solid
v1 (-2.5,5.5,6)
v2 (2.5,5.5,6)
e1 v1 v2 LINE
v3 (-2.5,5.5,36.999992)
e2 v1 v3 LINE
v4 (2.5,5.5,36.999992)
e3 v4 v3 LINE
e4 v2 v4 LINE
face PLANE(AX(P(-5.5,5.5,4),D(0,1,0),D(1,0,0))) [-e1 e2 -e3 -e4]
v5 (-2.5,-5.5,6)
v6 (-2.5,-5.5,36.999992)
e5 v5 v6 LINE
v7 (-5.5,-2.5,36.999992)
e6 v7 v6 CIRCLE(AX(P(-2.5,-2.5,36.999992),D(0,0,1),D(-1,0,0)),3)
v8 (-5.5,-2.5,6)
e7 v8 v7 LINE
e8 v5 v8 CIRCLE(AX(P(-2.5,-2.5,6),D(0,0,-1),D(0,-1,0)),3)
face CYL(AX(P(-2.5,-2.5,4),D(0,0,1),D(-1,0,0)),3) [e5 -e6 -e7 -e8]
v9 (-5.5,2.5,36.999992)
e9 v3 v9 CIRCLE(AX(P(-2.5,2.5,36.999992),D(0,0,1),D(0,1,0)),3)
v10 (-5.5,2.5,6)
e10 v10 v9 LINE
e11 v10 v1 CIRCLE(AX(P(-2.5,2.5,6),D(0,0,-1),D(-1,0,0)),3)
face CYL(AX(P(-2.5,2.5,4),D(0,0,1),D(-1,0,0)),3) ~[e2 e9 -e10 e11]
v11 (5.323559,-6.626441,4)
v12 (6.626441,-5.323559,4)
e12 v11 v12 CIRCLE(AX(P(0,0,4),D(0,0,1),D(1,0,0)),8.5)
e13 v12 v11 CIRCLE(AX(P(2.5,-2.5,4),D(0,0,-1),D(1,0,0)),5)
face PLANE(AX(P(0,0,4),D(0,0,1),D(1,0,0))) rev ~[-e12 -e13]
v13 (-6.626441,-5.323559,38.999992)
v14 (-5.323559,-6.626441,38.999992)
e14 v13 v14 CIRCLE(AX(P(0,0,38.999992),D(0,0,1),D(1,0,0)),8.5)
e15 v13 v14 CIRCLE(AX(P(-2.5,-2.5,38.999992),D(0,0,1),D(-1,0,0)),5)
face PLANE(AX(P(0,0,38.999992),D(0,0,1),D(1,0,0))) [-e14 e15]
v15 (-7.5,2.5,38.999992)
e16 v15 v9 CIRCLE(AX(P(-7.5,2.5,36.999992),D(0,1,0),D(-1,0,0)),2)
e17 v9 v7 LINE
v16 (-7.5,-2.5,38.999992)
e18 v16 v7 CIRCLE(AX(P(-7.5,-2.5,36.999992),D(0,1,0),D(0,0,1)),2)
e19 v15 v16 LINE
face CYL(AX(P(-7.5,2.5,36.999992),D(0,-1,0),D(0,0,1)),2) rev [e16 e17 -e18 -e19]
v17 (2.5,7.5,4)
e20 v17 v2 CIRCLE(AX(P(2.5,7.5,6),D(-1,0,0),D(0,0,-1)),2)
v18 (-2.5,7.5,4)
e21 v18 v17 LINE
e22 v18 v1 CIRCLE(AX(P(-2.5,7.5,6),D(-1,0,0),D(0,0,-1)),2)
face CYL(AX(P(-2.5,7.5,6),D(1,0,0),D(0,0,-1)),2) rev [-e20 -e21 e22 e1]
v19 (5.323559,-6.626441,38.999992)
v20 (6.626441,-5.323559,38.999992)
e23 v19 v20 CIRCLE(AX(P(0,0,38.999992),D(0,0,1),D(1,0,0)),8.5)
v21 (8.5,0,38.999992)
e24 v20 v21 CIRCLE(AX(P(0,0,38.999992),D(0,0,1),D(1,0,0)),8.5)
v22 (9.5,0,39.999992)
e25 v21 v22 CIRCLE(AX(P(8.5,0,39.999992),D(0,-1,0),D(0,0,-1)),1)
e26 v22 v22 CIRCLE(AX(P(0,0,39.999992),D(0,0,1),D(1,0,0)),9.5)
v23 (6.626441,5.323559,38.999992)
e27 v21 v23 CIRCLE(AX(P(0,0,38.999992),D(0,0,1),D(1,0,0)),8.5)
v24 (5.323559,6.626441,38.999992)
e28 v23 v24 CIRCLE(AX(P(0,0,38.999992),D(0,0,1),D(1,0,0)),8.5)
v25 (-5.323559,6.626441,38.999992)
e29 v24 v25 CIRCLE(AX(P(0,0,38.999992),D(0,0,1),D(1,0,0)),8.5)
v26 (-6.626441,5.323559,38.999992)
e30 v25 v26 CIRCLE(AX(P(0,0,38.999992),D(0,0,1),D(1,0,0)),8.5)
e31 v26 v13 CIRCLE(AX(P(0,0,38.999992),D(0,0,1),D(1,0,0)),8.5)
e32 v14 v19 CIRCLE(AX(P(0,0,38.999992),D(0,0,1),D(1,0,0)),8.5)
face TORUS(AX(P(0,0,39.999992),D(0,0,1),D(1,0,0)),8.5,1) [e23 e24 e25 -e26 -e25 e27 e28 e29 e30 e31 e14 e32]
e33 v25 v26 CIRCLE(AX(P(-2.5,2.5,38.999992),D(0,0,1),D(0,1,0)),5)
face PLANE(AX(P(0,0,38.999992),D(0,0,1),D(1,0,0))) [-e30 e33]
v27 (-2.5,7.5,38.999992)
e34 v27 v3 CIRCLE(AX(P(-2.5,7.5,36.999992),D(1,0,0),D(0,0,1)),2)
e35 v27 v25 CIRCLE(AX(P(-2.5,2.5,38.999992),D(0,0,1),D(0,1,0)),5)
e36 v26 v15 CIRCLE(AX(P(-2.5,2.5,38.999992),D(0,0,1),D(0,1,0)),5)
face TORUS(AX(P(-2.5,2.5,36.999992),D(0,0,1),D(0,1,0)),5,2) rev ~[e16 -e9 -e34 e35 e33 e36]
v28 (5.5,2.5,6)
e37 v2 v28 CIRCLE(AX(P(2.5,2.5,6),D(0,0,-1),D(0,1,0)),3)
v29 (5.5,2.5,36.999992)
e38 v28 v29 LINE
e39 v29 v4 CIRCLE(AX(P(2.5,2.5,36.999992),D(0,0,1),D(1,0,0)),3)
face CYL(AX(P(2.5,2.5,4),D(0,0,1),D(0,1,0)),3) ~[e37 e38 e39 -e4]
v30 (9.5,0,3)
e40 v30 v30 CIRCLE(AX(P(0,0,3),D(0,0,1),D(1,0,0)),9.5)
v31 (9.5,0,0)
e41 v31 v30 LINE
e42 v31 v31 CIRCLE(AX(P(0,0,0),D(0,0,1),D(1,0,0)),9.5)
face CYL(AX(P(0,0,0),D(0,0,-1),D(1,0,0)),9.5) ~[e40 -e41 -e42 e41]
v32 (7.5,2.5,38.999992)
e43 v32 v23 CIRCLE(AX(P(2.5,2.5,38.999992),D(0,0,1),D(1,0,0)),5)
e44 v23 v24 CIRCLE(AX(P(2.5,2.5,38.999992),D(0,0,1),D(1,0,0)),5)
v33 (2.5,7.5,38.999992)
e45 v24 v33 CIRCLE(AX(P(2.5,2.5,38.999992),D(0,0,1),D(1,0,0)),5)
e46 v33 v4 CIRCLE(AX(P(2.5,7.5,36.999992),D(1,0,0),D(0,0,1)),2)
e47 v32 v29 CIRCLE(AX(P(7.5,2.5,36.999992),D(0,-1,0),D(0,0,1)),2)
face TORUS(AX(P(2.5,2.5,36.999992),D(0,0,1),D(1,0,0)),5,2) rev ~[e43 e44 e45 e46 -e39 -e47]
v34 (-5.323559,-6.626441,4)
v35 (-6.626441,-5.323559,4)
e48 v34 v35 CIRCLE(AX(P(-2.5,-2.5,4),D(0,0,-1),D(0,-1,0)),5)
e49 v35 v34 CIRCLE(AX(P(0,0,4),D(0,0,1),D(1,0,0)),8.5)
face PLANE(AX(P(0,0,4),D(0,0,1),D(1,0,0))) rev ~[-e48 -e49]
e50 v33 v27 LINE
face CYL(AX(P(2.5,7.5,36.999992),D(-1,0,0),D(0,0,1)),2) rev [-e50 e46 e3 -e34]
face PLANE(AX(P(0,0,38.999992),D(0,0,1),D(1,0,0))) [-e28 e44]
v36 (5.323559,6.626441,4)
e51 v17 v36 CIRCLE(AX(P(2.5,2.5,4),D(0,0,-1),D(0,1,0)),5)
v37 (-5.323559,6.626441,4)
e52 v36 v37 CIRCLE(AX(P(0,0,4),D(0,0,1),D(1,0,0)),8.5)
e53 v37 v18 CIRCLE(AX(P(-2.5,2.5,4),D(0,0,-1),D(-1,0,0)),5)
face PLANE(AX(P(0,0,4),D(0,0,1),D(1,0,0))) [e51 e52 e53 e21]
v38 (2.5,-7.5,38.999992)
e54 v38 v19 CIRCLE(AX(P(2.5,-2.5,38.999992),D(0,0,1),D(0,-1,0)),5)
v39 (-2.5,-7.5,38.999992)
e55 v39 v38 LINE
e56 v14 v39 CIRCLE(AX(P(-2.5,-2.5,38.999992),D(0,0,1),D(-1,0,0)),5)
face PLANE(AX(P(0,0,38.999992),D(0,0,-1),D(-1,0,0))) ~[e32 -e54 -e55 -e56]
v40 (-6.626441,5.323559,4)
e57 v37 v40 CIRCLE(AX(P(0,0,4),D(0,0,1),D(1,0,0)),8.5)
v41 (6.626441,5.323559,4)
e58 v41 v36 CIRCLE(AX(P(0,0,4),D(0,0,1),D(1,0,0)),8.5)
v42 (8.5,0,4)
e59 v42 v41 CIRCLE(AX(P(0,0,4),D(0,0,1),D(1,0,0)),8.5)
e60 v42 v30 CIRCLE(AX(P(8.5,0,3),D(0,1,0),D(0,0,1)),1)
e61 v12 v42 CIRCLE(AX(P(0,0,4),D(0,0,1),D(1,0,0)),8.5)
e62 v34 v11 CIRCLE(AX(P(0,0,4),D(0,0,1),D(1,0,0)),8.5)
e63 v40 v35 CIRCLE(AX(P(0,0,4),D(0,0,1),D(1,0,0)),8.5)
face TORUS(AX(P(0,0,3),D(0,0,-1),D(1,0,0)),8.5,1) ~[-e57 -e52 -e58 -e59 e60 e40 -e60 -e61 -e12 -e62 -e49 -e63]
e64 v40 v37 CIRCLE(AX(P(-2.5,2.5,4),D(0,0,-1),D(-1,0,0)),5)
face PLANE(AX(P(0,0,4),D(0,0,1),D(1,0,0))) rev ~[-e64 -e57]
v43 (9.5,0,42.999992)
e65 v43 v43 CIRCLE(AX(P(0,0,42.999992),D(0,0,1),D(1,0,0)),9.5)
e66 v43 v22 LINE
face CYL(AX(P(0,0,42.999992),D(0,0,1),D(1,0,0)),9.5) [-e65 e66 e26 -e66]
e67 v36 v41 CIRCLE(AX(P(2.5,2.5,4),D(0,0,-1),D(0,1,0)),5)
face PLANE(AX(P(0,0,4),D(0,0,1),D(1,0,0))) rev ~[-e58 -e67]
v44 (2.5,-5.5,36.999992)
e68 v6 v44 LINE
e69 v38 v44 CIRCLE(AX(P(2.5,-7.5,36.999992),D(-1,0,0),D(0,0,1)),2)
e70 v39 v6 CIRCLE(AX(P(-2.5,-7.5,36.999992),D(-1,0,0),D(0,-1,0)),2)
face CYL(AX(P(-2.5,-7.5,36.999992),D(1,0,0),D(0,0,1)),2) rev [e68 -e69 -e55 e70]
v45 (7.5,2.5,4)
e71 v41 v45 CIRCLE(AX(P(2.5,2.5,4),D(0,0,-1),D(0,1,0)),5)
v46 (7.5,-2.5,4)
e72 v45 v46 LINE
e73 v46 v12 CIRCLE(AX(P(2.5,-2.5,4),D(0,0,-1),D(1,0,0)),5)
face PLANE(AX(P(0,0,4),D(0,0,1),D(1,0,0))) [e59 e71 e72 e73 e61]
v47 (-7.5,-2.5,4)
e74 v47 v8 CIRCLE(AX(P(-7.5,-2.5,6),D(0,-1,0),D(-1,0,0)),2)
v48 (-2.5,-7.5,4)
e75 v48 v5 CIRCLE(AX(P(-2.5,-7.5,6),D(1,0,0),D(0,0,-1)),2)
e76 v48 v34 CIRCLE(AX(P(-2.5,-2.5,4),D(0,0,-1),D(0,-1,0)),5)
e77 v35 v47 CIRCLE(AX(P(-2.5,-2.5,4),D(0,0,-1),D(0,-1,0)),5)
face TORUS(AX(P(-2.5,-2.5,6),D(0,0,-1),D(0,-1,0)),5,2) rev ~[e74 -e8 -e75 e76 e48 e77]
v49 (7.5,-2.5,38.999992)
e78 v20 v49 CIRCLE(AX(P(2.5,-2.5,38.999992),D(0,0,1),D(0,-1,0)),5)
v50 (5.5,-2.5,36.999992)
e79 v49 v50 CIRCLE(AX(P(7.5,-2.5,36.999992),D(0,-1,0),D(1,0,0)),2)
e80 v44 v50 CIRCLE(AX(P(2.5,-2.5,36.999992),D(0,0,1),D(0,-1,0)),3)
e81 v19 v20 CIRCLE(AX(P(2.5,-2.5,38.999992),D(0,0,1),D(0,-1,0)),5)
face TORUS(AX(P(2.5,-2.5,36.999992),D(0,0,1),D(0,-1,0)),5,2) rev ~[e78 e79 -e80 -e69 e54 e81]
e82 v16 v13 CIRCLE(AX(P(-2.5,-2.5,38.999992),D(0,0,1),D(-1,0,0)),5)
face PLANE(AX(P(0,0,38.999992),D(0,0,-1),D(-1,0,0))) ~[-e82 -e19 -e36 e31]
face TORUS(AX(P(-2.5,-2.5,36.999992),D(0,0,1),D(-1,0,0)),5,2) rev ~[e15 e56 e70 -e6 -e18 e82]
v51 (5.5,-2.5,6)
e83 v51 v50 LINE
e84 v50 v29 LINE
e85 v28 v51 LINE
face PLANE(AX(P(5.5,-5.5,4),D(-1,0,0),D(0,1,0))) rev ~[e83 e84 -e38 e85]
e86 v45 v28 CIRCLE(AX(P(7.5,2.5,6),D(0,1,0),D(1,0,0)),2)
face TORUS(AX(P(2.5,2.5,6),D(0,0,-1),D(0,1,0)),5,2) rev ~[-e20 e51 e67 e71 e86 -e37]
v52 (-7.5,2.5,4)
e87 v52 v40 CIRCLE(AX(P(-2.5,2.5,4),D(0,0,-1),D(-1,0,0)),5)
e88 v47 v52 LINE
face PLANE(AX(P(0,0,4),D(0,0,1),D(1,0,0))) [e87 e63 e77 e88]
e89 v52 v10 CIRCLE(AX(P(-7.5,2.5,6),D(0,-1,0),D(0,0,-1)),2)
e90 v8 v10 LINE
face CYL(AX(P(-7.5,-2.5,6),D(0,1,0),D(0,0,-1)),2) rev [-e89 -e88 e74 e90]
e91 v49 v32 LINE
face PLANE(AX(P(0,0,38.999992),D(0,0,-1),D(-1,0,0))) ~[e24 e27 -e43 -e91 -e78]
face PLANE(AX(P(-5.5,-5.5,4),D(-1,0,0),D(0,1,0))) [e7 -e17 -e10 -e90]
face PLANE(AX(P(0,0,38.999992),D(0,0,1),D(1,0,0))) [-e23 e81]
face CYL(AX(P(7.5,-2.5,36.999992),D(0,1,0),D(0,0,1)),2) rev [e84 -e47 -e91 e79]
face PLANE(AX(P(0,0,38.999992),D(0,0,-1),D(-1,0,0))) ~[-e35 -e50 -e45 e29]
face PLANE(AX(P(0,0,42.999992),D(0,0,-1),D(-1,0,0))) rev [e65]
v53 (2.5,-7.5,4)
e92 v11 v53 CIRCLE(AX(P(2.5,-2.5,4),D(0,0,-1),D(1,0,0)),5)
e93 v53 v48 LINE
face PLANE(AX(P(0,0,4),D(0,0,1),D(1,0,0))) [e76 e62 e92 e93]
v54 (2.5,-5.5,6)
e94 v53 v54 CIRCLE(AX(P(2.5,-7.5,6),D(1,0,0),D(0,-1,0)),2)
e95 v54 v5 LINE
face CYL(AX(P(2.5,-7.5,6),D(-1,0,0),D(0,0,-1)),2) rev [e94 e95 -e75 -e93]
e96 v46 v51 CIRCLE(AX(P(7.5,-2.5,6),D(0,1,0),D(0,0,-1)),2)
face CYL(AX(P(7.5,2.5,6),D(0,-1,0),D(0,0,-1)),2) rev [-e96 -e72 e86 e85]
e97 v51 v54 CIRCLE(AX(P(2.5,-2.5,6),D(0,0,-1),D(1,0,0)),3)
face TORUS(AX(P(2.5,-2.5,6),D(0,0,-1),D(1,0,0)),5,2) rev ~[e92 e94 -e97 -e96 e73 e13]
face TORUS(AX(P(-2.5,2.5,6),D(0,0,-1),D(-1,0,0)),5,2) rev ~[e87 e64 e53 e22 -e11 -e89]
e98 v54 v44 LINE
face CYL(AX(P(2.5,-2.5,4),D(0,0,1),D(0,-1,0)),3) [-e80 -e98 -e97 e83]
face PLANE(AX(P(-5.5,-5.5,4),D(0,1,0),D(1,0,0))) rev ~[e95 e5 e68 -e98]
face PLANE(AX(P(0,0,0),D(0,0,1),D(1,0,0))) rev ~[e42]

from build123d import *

# Parameters (mm, degrees)
F0_R     = 9.5
F1_DEPTH = 4
F2_W     = 11
F2_H     = 11
F3_DEPTH = 35
F6_R     = 3
F7_R     = 2


# Not quite as in the source:
# - a fillet or chamfer that OpenCascade refuses, or shapes differently, is made with other operations: its cross-section is extruded or revolved along the edge and cut away or added
# - a pattern or mirror of a feature is missing from the dataset's text; its kind, count and spacing are read off the source's solid


with BuildPart() as f1:
    # F0 (on Top) → F1 (new body)
    with BuildSketch(Plane.XY):
        Circle(F0_R)
    extrude(amount=F1_DEPTH)


with BuildPart() as f1_copies_1:
    # F1_copies: instance of F1
    add(f1.part.mirror(Plane.XY.offset(21.499996)))


with BuildPart() as f1_1:
    add(f1.part)

    add(f1_copies_1.part)  # F3 merges F1_copies_1
    # F2 (on face) → F3 (join)
    with BuildSketch(Plane.XY.offset(4)):
        Rectangle(F2_W, F2_H)
    extrude(amount=F3_DEPTH)

    # F6
    f6_edges = [f1_1.edges().sort_by_distance(p)[0] for p in [
        (5.5, -5.5, 21.499996),
        (5.5, 5.5, 21.499996),
        (-5.5, -5.5, 21.499996),
        (-5.5, 5.5, 21.499996),
    ]]
    fillet(f6_edges, radius=F6_R)

    # F7
    f7_edges = [f1_1.edges().sort_by_distance(p)[0] for p in [
        (0, 5.5, 4),
        (2.5, 5.5, 21.499996),
        (-2.5, 5.5, 21.499996),
        (0, 5.5, 38.999992),
        (4.62132, 4.62132, 4),
        (5.5, 0, 38.999992),
        (4.62132, 4.62132, 38.999992),
        (4.62132, -4.62132, 38.999992),
        (0, -5.5, 38.999992),
        (-4.62132, 4.62132, 38.999992),
        (-4.62132, -4.62132, 38.999992),
        (-5.5, 0, 38.999992),
        (5.5, 0, 4),
        (4.62132, -4.62132, 4),
        (0, -5.5, 4),
        (-4.62132, 4.62132, 4),
        (-4.62132, -4.62132, 4),
        (-5.5, 0, 4),
    ]]
    fillet(f7_edges, radius=F7_R)

    # F8: fillet of radius 1 on 2 edges, made by hand

    # F8_s1 → F8_t2 (revolve, cut)
    with BuildSketch(Plane.XZ):
        with BuildLine():
            ThreePointArc((8.5, 4), (9.2071067812, 3.7071067812), (9.5, 3))
            Line((9.5, 3), (9.5, 4))
            Line((9.5, 4), (8.5, 4))
        make_face()
    revolve(axis=Axis((0, 0, 4), (0, 0, 1)), mode=Mode.SUBTRACT)

    # F8_s3 → F8_t4 (revolve, cut)
    with BuildSketch(Plane.XZ):
        with BuildLine():
            ThreePointArc((8.5, 38.999992), (9.2071067812, 39.2928852188), (9.5, 39.999992))
            Line((9.5, 39.999992), (9.5, 38.999992))
            Line((9.5, 38.999992), (8.5, 38.999992))
        make_face()
    revolve(axis=Axis((0, 0, 38.999992), (0, 0, 1)), mode=Mode.SUBTRACT)


solid = f1_1.part
